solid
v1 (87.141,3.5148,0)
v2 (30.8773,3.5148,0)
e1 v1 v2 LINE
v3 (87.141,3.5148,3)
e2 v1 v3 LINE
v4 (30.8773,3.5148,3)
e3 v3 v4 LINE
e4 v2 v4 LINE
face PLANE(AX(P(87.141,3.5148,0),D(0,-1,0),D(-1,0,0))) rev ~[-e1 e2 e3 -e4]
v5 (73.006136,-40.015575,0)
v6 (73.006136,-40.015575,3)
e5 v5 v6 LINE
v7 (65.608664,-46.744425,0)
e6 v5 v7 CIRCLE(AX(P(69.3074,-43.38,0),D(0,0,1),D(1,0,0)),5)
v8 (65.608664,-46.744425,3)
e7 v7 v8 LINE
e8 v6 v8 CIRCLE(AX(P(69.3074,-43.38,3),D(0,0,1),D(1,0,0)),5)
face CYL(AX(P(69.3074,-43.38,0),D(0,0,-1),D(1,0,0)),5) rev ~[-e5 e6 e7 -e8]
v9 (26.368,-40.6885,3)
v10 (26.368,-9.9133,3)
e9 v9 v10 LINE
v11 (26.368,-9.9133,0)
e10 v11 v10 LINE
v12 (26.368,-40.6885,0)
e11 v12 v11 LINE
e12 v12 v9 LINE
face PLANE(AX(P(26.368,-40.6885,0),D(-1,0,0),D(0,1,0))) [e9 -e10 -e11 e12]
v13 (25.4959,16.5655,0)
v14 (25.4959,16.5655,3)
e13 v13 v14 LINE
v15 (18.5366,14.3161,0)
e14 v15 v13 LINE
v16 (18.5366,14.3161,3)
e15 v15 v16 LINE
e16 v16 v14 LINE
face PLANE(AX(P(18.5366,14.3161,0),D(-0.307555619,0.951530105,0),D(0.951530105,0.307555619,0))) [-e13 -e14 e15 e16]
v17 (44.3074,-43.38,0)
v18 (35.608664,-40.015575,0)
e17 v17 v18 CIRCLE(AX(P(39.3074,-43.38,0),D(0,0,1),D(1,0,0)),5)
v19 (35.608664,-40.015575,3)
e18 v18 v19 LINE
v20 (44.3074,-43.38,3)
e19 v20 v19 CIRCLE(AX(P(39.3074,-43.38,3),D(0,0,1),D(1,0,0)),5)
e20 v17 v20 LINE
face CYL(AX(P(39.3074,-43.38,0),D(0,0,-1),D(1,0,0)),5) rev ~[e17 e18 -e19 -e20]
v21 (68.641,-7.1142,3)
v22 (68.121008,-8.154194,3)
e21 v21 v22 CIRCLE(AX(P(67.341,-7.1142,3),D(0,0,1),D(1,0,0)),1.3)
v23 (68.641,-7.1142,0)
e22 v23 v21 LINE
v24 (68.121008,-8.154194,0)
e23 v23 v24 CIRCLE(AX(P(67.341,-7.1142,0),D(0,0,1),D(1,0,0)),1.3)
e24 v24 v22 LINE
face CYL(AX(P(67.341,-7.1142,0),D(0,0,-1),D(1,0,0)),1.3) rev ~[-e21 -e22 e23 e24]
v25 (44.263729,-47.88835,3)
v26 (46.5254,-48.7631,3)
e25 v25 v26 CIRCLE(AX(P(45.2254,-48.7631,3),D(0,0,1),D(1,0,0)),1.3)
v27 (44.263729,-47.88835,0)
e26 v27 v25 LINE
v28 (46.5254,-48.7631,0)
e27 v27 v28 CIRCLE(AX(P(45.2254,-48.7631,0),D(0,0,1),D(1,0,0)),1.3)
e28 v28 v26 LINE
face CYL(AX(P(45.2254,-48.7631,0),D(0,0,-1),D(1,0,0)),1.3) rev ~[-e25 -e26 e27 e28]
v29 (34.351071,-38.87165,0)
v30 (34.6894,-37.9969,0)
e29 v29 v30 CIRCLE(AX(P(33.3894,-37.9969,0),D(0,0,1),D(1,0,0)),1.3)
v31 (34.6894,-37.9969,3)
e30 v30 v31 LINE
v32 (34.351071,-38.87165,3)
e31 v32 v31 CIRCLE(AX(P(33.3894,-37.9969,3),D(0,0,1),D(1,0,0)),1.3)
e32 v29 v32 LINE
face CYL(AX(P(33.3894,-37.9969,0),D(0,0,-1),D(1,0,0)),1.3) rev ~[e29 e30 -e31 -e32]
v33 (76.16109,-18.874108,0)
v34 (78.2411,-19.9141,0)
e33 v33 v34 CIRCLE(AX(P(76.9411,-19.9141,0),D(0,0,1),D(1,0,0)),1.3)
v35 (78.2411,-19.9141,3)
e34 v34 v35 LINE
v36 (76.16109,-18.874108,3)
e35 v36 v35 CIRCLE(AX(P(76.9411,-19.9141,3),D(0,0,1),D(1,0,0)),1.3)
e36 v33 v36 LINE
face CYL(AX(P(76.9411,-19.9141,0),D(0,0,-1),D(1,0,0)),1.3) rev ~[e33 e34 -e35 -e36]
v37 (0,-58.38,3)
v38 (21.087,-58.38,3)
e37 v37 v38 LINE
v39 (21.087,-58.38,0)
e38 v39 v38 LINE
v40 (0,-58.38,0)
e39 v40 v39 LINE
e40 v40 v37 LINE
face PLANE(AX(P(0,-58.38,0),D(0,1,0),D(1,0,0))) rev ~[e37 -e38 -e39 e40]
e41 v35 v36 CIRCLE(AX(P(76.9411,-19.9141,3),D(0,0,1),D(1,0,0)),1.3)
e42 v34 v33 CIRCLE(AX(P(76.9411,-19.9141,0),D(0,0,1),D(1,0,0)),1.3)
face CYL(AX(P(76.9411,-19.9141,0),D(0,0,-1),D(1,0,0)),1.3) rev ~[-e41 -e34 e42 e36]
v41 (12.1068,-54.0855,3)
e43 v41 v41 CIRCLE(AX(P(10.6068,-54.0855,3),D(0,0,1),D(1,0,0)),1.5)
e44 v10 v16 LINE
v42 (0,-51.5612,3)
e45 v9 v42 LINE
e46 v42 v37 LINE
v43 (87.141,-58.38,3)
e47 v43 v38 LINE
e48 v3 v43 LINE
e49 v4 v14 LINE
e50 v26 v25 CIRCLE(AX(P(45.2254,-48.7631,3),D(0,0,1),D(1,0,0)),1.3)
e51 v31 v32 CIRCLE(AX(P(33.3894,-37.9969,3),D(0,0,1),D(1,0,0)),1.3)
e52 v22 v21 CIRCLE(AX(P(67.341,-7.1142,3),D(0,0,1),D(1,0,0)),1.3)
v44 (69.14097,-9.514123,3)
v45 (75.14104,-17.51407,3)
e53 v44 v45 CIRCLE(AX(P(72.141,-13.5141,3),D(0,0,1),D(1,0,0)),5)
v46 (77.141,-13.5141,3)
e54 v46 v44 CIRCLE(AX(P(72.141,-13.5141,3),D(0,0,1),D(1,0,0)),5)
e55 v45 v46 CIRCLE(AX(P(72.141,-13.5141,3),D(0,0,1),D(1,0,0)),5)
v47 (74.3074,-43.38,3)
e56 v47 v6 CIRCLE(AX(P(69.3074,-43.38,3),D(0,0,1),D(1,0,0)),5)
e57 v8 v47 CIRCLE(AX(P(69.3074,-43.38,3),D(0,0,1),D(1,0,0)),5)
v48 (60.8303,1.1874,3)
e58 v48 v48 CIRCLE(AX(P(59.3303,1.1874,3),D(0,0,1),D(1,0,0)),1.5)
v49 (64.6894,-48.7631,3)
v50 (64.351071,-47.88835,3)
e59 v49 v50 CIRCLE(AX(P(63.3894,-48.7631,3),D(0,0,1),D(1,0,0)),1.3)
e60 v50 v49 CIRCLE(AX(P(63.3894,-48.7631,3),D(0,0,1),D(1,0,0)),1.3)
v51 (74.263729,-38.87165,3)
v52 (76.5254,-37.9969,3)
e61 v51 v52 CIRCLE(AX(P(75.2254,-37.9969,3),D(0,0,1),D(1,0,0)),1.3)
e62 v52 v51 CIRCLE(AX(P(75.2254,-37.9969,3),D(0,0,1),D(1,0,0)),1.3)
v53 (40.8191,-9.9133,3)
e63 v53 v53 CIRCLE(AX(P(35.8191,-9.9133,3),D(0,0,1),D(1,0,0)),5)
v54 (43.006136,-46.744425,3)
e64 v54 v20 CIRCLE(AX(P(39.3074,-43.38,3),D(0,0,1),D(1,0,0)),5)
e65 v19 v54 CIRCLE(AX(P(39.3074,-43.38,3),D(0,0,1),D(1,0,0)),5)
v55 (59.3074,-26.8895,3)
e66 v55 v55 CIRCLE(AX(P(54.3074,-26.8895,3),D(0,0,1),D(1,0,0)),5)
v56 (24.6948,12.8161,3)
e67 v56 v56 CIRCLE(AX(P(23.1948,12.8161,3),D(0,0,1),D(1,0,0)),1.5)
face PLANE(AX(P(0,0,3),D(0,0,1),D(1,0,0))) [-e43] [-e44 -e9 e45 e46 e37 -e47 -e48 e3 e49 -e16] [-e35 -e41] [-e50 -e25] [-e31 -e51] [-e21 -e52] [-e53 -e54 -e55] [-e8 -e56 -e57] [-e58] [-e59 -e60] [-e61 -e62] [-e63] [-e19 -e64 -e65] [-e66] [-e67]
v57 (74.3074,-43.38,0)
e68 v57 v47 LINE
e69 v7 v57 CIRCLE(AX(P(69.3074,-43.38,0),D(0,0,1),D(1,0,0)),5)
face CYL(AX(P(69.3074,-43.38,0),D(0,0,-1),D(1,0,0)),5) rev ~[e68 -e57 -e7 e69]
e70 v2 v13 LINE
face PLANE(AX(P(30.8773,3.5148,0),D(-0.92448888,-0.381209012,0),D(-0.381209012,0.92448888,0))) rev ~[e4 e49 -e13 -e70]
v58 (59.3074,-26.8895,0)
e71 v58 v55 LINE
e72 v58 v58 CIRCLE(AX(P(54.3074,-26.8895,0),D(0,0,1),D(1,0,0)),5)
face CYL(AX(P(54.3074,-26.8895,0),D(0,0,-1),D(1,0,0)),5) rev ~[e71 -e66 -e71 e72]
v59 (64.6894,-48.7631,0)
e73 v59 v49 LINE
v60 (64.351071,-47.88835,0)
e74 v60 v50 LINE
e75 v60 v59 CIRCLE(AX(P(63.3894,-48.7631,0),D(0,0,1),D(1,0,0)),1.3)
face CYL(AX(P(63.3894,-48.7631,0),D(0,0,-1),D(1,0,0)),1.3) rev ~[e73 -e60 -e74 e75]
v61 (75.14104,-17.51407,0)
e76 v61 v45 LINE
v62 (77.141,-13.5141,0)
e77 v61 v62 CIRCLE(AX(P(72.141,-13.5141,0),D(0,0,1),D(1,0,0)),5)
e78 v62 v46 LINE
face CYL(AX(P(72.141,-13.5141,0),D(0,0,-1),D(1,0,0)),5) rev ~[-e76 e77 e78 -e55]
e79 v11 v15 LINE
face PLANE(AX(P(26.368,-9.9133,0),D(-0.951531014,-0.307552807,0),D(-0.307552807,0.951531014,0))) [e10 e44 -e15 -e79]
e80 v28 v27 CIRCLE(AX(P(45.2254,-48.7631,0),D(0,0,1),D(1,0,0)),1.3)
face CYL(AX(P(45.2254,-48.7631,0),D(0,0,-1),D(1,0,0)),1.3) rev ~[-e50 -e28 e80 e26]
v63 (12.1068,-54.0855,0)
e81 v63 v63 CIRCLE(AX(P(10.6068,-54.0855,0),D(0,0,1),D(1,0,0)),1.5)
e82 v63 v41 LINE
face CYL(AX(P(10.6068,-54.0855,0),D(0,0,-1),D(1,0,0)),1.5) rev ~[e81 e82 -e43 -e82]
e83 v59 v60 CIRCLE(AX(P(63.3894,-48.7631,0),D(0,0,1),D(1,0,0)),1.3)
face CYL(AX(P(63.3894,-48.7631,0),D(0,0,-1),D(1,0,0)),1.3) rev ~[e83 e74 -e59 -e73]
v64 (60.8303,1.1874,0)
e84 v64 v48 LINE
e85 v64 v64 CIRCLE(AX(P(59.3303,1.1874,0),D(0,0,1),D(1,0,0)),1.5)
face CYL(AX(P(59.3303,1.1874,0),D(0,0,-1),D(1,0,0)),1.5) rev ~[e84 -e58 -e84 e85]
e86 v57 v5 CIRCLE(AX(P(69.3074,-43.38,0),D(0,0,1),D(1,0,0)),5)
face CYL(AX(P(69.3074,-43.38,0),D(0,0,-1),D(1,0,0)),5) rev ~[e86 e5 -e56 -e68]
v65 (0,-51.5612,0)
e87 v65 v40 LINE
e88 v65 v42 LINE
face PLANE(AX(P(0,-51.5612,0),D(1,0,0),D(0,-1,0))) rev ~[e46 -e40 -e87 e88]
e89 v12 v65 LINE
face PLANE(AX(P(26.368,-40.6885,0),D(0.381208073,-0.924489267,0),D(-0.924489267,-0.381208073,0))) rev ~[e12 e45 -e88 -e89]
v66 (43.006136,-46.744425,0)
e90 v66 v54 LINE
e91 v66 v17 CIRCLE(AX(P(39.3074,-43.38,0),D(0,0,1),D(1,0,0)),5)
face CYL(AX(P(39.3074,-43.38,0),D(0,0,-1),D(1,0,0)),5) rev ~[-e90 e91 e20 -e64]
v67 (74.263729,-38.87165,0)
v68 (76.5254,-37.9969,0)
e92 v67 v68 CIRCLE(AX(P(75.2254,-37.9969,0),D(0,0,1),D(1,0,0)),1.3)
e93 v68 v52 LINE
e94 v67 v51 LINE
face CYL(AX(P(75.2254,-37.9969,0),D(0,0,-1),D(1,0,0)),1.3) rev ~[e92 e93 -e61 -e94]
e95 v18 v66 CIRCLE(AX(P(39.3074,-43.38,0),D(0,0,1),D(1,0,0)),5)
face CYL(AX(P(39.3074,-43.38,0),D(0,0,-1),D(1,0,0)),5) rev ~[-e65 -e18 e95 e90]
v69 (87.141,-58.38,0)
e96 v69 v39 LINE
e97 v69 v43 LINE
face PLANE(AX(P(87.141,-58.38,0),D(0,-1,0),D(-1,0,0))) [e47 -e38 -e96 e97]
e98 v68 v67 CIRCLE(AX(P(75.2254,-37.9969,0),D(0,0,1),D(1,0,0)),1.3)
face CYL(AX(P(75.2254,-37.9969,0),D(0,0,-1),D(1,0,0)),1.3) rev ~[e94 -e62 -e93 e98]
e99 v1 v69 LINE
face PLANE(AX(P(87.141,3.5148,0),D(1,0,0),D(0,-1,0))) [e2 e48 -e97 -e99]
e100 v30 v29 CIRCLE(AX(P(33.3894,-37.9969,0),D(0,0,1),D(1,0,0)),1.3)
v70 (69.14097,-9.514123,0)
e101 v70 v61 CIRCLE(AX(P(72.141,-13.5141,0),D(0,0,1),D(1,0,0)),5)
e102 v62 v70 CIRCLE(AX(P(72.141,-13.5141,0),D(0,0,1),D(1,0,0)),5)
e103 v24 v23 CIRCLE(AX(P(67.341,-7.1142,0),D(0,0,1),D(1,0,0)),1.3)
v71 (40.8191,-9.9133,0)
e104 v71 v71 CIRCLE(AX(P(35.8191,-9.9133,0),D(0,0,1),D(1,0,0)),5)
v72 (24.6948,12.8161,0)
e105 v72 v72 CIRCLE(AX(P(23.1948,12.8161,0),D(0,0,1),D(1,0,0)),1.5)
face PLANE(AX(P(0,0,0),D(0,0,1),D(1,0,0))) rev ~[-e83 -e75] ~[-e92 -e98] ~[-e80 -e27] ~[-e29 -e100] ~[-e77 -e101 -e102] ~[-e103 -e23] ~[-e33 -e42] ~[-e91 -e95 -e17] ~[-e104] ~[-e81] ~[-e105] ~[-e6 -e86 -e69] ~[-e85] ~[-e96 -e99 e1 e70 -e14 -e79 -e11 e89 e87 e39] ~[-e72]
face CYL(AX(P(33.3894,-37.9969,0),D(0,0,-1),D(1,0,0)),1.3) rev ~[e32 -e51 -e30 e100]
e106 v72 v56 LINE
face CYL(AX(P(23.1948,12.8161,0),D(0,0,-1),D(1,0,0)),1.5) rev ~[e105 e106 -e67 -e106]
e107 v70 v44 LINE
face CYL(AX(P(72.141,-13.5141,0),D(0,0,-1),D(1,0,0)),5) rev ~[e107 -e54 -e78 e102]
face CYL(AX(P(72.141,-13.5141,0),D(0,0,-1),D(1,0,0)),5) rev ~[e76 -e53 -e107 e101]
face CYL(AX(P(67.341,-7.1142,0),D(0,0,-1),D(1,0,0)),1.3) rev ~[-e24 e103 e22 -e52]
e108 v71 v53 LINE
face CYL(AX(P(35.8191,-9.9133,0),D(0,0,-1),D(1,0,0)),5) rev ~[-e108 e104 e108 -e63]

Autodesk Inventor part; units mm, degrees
ref_plane "YZ Plane" through (0, 0, 0) normal (1, 0, 0) x (0, 1, 0)
ref_plane "XZ Plane" through (0, 0, 0) normal (0, 1, 0) x (-1, 0, 0)
ref_plane "XY Plane" through (0, 0, 0) normal (0, 0, 1) x (1, 0, 0)
sketch "ギア線図" plane through (0, 0, 0) normal (0, 0, 1) x (1, 0, 0)
  circle A0 centre (11.2246, -29.111) radius 11.1
  circle A1 centre (54.3074, -26.8895) radius 20.05
  circle A2 centre (54.3074, -26.8895) radius 4.55
  circle A3 centre (35.8191, -9.9133) radius 11.1
  circle A4 centre (39.3074, -43.38) radius 2.05
  circle A5 centre (69.3074, -43.38) radius 2.05
  circle A6 centre (72.141, -13.5141) radius 2.05
  circle A7 centre (39.3074, -43.38) radius 15
  circle A8 centre (69.3074, -43.38) radius 15
  circle A9 centre (72.141, -13.5141) radius 15
  circle A10 centre (54.3074, -26.8895) radius 5.5 construction
  circle A11 centre (11.2246, -29.111) radius 13 construction
  circle A12 centre (54.3074, -26.8895) radius 20.5 construction
  circle A13 centre (35.8191, -9.9133) radius 20.55
  circle A14 centre (35.8191, -9.9133) radius 21.5 construction
  circle A15 centre (35.8191, -9.9133) radius 13 construction
  circle A16 centre (39.3074, -43.38) radius 2.5 construction
  circle A17 centre (69.3074, -43.38) radius 2.5 construction
  circle A18 centre (72.141, -13.5141) radius 2.5 construction
  circle A19 centre (11.2246, -29.111) radius 20.1
  circle A20 centre (11.2246, -29.111) radius 22 construction
  line L0 (39.3074, -43.38) -> (69.3074, -43.38)
  circle A21 centre (0, 0) radius 20.1
  circle A22 centre (0, 0) radius 22 construction
  circle A23 centre (39.3074, -43.38) radius 9.5 construction
  circle A24 centre (69.3074, -43.38) radius 9.5 construction
  circle A25 centre (72.141, -13.5141) radius 9.5 construction
  point P0 (58.2233, -20.0465)
  point P1 (42.0436, -35)
  point P2 (21.5995, 15.2696)
  point P3 (38.2329, 5.9161)
  point P4 (24.1755, 8.4229)
  point P5 (21.6039, 15.1272)
  point P6 (23.3458, 16.3469)
  point P7 (23.3177, 16.3886)
  dimension "d7" = 22.2
  dimension "d8" = 40.1
  dimension "d9" = 9.1
  dimension "d11" = 22.2
  dimension "d12" = 4.1
  dimension "d13" = 4.1
  dimension "d14" = 4.1
  dimension "d15" = 30
  dimension "d16" = 30
  dimension "d17" = 30
  dimension "d18" = 11
  dimension "d21" = 26
  dimension "d29" = 41
  dimension "d39" = 22.2921
  dimension "d40" = 22.2921
  dimension "d41" = 22.2921
  dimension "d43" = 41.1
  dimension "d44" = 43
  dimension "d45" = 26
  dimension "d46" = 5
  dimension "d47" = 5
  dimension "d48" = 5
  dimension "d49" = 40.2
  dimension "d50" = 44
  dimension "d53" = 40.2
  dimension "d55" = 44
  dimension "d58" = 19
  dimension "d59" = 19
  dimension "d60" = 19
sketch "スケッチ3" plane through (0, 0, 0) normal (0, 0, 1) x (1, 0, 0)
  circle A0 centre (54.3074, -26.8895) radius 20.05 construction
  circle A1 centre (39.3074, -43.38) radius 2.05 construction
  circle A2 centre (69.3074, -43.38) radius 2.05 construction
  circle A3 centre (72.141, -13.5141) radius 2.05 construction
  circle A4 centre (39.3074, -43.38) radius 15 construction
  circle A5 centre (69.3074, -43.38) radius 15 construction
  circle A6 centre (72.141, -13.5141) radius 15 construction
  line L0 (39.3074, -43.38) -> (45.2254, -48.7631)
  line L1 (45.2254, -48.7631) -> (39.3074, -43.38)
  line L2 (39.3074, -43.38) -> (33.3894, -37.9969)
  line L3 (39.3074, -43.38) -> (40.8161, -41.7214)
  circle A7 centre (33.3894, -37.9969) radius 1.3
  circle A8 centre (45.2254, -48.7631) radius 1.3
  line L4 (69.3074, -43.38) -> (67.7987, -41.7214)
  line L5 (69.3074, -43.38) -> (75.2254, -37.9969)
  line L6 (69.3074, -43.38) -> (63.3894, -48.7631)
  circle A9 centre (63.3894, -48.7631) radius 1.3
  circle A10 centre (75.2254, -37.9969) radius 1.3
  line L7 (72.141, -13.5141) -> (70.3474, -14.8594)
  line L8 (67.341, -7.1142) -> (72.141, -13.5141)
  line L9 (72.141, -13.5141) -> (76.9411, -19.9141)
  circle A11 centre (67.341, -7.1142) radius 1.3
  circle A12 centre (76.9411, -19.9141) radius 1.3
  circle A13 centre (39.3074, -43.38) radius 5
  circle A14 centre (69.3074, -43.38) radius 5
  circle A15 centre (72.141, -13.5141) radius 5
  circle A16 centre (54.3074, -26.8895) radius 5
  circle A17 centre (35.8191, -9.9133) radius 11.1 construction
  line L10 (87.141, -58.38) -> (21.087, -58.38)
  line L11 (87.141, 3.5148) -> (87.141, -58.38)
  circle A18 centre (35.8191, -9.9133) radius 5
  circle A19 centre (23.1948, 12.8161) radius 1.5
  circle A20 centre (59.3303, 1.1874) radius 1.5
  circle A21 centre (11.2246, -29.111) radius 5
  circle A22 centre (10.6068, -54.0855) radius 1.5
  line L12 (87.141, 3.5148) -> (30.8773, 3.5148)
  line L13 (30.8773, 3.5148) -> (25.4959, 16.5655)
  line L14 (26.368, -40.6885) -> (0, -51.5612)
  line L15 (0, -51.5612) -> (0, -58.38)
  line L16 (0, -58.38) -> (21.087, -58.38)
  line L17 (26.368, -40.6885) -> (26.368, -9.9133)
  line L18 (26.368, -9.9133) -> (18.5366, 14.3161)
  line L19 (18.5366, 14.3161) -> (25.4959, 16.5655)
  point P0 (0, 0)
  point P1 (0, 0)
  dimension "d61" = 8
  dimension "d62" = 8
  dimension "d63" = 2.6
  dimension "d64" = 2.6
  dimension "d65" = 8
  dimension "d66" = 8
  dimension "d67" = 2.6
  dimension "d68" = 2.6
  dimension "d69" = 8
  dimension "d70" = 8
  dimension "d71" = 2.6
  dimension "d72" = 2.6
  dimension "d73" = 10
  dimension "d74" = 10
  dimension "d75" = 10
  dimension "d76" = 10
  dimension "d79" = 10
extrude "押し出し1" add sketch "スケッチ3" along normal blind 3 contours L10 L16 L15 L14 L17 L18 L19 L13 L12 L11
sketch "スケッチ5" plane through (0, 0, 3) normal (0, 0, 1) x (1, 0, 0)
  circle A0 centre (10.6068, -54.0855) radius 1.5 projected
  circle A1 centre (23.1948, 12.8161) radius 1.5 projected
  circle A2 centre (59.3303, 1.1874) radius 1.5 projected
  circle A3 centre (54.3074, -26.8895) radius 5 projected
  circle A4 centre (35.8191, -9.9133) radius 5 projected
  point P0 (0, 0)
equation "\"d40\" = d39"
equation "\"d41\" = d40"
properties part number "モーターマウント" material "アルミニウム 2014-T4"
